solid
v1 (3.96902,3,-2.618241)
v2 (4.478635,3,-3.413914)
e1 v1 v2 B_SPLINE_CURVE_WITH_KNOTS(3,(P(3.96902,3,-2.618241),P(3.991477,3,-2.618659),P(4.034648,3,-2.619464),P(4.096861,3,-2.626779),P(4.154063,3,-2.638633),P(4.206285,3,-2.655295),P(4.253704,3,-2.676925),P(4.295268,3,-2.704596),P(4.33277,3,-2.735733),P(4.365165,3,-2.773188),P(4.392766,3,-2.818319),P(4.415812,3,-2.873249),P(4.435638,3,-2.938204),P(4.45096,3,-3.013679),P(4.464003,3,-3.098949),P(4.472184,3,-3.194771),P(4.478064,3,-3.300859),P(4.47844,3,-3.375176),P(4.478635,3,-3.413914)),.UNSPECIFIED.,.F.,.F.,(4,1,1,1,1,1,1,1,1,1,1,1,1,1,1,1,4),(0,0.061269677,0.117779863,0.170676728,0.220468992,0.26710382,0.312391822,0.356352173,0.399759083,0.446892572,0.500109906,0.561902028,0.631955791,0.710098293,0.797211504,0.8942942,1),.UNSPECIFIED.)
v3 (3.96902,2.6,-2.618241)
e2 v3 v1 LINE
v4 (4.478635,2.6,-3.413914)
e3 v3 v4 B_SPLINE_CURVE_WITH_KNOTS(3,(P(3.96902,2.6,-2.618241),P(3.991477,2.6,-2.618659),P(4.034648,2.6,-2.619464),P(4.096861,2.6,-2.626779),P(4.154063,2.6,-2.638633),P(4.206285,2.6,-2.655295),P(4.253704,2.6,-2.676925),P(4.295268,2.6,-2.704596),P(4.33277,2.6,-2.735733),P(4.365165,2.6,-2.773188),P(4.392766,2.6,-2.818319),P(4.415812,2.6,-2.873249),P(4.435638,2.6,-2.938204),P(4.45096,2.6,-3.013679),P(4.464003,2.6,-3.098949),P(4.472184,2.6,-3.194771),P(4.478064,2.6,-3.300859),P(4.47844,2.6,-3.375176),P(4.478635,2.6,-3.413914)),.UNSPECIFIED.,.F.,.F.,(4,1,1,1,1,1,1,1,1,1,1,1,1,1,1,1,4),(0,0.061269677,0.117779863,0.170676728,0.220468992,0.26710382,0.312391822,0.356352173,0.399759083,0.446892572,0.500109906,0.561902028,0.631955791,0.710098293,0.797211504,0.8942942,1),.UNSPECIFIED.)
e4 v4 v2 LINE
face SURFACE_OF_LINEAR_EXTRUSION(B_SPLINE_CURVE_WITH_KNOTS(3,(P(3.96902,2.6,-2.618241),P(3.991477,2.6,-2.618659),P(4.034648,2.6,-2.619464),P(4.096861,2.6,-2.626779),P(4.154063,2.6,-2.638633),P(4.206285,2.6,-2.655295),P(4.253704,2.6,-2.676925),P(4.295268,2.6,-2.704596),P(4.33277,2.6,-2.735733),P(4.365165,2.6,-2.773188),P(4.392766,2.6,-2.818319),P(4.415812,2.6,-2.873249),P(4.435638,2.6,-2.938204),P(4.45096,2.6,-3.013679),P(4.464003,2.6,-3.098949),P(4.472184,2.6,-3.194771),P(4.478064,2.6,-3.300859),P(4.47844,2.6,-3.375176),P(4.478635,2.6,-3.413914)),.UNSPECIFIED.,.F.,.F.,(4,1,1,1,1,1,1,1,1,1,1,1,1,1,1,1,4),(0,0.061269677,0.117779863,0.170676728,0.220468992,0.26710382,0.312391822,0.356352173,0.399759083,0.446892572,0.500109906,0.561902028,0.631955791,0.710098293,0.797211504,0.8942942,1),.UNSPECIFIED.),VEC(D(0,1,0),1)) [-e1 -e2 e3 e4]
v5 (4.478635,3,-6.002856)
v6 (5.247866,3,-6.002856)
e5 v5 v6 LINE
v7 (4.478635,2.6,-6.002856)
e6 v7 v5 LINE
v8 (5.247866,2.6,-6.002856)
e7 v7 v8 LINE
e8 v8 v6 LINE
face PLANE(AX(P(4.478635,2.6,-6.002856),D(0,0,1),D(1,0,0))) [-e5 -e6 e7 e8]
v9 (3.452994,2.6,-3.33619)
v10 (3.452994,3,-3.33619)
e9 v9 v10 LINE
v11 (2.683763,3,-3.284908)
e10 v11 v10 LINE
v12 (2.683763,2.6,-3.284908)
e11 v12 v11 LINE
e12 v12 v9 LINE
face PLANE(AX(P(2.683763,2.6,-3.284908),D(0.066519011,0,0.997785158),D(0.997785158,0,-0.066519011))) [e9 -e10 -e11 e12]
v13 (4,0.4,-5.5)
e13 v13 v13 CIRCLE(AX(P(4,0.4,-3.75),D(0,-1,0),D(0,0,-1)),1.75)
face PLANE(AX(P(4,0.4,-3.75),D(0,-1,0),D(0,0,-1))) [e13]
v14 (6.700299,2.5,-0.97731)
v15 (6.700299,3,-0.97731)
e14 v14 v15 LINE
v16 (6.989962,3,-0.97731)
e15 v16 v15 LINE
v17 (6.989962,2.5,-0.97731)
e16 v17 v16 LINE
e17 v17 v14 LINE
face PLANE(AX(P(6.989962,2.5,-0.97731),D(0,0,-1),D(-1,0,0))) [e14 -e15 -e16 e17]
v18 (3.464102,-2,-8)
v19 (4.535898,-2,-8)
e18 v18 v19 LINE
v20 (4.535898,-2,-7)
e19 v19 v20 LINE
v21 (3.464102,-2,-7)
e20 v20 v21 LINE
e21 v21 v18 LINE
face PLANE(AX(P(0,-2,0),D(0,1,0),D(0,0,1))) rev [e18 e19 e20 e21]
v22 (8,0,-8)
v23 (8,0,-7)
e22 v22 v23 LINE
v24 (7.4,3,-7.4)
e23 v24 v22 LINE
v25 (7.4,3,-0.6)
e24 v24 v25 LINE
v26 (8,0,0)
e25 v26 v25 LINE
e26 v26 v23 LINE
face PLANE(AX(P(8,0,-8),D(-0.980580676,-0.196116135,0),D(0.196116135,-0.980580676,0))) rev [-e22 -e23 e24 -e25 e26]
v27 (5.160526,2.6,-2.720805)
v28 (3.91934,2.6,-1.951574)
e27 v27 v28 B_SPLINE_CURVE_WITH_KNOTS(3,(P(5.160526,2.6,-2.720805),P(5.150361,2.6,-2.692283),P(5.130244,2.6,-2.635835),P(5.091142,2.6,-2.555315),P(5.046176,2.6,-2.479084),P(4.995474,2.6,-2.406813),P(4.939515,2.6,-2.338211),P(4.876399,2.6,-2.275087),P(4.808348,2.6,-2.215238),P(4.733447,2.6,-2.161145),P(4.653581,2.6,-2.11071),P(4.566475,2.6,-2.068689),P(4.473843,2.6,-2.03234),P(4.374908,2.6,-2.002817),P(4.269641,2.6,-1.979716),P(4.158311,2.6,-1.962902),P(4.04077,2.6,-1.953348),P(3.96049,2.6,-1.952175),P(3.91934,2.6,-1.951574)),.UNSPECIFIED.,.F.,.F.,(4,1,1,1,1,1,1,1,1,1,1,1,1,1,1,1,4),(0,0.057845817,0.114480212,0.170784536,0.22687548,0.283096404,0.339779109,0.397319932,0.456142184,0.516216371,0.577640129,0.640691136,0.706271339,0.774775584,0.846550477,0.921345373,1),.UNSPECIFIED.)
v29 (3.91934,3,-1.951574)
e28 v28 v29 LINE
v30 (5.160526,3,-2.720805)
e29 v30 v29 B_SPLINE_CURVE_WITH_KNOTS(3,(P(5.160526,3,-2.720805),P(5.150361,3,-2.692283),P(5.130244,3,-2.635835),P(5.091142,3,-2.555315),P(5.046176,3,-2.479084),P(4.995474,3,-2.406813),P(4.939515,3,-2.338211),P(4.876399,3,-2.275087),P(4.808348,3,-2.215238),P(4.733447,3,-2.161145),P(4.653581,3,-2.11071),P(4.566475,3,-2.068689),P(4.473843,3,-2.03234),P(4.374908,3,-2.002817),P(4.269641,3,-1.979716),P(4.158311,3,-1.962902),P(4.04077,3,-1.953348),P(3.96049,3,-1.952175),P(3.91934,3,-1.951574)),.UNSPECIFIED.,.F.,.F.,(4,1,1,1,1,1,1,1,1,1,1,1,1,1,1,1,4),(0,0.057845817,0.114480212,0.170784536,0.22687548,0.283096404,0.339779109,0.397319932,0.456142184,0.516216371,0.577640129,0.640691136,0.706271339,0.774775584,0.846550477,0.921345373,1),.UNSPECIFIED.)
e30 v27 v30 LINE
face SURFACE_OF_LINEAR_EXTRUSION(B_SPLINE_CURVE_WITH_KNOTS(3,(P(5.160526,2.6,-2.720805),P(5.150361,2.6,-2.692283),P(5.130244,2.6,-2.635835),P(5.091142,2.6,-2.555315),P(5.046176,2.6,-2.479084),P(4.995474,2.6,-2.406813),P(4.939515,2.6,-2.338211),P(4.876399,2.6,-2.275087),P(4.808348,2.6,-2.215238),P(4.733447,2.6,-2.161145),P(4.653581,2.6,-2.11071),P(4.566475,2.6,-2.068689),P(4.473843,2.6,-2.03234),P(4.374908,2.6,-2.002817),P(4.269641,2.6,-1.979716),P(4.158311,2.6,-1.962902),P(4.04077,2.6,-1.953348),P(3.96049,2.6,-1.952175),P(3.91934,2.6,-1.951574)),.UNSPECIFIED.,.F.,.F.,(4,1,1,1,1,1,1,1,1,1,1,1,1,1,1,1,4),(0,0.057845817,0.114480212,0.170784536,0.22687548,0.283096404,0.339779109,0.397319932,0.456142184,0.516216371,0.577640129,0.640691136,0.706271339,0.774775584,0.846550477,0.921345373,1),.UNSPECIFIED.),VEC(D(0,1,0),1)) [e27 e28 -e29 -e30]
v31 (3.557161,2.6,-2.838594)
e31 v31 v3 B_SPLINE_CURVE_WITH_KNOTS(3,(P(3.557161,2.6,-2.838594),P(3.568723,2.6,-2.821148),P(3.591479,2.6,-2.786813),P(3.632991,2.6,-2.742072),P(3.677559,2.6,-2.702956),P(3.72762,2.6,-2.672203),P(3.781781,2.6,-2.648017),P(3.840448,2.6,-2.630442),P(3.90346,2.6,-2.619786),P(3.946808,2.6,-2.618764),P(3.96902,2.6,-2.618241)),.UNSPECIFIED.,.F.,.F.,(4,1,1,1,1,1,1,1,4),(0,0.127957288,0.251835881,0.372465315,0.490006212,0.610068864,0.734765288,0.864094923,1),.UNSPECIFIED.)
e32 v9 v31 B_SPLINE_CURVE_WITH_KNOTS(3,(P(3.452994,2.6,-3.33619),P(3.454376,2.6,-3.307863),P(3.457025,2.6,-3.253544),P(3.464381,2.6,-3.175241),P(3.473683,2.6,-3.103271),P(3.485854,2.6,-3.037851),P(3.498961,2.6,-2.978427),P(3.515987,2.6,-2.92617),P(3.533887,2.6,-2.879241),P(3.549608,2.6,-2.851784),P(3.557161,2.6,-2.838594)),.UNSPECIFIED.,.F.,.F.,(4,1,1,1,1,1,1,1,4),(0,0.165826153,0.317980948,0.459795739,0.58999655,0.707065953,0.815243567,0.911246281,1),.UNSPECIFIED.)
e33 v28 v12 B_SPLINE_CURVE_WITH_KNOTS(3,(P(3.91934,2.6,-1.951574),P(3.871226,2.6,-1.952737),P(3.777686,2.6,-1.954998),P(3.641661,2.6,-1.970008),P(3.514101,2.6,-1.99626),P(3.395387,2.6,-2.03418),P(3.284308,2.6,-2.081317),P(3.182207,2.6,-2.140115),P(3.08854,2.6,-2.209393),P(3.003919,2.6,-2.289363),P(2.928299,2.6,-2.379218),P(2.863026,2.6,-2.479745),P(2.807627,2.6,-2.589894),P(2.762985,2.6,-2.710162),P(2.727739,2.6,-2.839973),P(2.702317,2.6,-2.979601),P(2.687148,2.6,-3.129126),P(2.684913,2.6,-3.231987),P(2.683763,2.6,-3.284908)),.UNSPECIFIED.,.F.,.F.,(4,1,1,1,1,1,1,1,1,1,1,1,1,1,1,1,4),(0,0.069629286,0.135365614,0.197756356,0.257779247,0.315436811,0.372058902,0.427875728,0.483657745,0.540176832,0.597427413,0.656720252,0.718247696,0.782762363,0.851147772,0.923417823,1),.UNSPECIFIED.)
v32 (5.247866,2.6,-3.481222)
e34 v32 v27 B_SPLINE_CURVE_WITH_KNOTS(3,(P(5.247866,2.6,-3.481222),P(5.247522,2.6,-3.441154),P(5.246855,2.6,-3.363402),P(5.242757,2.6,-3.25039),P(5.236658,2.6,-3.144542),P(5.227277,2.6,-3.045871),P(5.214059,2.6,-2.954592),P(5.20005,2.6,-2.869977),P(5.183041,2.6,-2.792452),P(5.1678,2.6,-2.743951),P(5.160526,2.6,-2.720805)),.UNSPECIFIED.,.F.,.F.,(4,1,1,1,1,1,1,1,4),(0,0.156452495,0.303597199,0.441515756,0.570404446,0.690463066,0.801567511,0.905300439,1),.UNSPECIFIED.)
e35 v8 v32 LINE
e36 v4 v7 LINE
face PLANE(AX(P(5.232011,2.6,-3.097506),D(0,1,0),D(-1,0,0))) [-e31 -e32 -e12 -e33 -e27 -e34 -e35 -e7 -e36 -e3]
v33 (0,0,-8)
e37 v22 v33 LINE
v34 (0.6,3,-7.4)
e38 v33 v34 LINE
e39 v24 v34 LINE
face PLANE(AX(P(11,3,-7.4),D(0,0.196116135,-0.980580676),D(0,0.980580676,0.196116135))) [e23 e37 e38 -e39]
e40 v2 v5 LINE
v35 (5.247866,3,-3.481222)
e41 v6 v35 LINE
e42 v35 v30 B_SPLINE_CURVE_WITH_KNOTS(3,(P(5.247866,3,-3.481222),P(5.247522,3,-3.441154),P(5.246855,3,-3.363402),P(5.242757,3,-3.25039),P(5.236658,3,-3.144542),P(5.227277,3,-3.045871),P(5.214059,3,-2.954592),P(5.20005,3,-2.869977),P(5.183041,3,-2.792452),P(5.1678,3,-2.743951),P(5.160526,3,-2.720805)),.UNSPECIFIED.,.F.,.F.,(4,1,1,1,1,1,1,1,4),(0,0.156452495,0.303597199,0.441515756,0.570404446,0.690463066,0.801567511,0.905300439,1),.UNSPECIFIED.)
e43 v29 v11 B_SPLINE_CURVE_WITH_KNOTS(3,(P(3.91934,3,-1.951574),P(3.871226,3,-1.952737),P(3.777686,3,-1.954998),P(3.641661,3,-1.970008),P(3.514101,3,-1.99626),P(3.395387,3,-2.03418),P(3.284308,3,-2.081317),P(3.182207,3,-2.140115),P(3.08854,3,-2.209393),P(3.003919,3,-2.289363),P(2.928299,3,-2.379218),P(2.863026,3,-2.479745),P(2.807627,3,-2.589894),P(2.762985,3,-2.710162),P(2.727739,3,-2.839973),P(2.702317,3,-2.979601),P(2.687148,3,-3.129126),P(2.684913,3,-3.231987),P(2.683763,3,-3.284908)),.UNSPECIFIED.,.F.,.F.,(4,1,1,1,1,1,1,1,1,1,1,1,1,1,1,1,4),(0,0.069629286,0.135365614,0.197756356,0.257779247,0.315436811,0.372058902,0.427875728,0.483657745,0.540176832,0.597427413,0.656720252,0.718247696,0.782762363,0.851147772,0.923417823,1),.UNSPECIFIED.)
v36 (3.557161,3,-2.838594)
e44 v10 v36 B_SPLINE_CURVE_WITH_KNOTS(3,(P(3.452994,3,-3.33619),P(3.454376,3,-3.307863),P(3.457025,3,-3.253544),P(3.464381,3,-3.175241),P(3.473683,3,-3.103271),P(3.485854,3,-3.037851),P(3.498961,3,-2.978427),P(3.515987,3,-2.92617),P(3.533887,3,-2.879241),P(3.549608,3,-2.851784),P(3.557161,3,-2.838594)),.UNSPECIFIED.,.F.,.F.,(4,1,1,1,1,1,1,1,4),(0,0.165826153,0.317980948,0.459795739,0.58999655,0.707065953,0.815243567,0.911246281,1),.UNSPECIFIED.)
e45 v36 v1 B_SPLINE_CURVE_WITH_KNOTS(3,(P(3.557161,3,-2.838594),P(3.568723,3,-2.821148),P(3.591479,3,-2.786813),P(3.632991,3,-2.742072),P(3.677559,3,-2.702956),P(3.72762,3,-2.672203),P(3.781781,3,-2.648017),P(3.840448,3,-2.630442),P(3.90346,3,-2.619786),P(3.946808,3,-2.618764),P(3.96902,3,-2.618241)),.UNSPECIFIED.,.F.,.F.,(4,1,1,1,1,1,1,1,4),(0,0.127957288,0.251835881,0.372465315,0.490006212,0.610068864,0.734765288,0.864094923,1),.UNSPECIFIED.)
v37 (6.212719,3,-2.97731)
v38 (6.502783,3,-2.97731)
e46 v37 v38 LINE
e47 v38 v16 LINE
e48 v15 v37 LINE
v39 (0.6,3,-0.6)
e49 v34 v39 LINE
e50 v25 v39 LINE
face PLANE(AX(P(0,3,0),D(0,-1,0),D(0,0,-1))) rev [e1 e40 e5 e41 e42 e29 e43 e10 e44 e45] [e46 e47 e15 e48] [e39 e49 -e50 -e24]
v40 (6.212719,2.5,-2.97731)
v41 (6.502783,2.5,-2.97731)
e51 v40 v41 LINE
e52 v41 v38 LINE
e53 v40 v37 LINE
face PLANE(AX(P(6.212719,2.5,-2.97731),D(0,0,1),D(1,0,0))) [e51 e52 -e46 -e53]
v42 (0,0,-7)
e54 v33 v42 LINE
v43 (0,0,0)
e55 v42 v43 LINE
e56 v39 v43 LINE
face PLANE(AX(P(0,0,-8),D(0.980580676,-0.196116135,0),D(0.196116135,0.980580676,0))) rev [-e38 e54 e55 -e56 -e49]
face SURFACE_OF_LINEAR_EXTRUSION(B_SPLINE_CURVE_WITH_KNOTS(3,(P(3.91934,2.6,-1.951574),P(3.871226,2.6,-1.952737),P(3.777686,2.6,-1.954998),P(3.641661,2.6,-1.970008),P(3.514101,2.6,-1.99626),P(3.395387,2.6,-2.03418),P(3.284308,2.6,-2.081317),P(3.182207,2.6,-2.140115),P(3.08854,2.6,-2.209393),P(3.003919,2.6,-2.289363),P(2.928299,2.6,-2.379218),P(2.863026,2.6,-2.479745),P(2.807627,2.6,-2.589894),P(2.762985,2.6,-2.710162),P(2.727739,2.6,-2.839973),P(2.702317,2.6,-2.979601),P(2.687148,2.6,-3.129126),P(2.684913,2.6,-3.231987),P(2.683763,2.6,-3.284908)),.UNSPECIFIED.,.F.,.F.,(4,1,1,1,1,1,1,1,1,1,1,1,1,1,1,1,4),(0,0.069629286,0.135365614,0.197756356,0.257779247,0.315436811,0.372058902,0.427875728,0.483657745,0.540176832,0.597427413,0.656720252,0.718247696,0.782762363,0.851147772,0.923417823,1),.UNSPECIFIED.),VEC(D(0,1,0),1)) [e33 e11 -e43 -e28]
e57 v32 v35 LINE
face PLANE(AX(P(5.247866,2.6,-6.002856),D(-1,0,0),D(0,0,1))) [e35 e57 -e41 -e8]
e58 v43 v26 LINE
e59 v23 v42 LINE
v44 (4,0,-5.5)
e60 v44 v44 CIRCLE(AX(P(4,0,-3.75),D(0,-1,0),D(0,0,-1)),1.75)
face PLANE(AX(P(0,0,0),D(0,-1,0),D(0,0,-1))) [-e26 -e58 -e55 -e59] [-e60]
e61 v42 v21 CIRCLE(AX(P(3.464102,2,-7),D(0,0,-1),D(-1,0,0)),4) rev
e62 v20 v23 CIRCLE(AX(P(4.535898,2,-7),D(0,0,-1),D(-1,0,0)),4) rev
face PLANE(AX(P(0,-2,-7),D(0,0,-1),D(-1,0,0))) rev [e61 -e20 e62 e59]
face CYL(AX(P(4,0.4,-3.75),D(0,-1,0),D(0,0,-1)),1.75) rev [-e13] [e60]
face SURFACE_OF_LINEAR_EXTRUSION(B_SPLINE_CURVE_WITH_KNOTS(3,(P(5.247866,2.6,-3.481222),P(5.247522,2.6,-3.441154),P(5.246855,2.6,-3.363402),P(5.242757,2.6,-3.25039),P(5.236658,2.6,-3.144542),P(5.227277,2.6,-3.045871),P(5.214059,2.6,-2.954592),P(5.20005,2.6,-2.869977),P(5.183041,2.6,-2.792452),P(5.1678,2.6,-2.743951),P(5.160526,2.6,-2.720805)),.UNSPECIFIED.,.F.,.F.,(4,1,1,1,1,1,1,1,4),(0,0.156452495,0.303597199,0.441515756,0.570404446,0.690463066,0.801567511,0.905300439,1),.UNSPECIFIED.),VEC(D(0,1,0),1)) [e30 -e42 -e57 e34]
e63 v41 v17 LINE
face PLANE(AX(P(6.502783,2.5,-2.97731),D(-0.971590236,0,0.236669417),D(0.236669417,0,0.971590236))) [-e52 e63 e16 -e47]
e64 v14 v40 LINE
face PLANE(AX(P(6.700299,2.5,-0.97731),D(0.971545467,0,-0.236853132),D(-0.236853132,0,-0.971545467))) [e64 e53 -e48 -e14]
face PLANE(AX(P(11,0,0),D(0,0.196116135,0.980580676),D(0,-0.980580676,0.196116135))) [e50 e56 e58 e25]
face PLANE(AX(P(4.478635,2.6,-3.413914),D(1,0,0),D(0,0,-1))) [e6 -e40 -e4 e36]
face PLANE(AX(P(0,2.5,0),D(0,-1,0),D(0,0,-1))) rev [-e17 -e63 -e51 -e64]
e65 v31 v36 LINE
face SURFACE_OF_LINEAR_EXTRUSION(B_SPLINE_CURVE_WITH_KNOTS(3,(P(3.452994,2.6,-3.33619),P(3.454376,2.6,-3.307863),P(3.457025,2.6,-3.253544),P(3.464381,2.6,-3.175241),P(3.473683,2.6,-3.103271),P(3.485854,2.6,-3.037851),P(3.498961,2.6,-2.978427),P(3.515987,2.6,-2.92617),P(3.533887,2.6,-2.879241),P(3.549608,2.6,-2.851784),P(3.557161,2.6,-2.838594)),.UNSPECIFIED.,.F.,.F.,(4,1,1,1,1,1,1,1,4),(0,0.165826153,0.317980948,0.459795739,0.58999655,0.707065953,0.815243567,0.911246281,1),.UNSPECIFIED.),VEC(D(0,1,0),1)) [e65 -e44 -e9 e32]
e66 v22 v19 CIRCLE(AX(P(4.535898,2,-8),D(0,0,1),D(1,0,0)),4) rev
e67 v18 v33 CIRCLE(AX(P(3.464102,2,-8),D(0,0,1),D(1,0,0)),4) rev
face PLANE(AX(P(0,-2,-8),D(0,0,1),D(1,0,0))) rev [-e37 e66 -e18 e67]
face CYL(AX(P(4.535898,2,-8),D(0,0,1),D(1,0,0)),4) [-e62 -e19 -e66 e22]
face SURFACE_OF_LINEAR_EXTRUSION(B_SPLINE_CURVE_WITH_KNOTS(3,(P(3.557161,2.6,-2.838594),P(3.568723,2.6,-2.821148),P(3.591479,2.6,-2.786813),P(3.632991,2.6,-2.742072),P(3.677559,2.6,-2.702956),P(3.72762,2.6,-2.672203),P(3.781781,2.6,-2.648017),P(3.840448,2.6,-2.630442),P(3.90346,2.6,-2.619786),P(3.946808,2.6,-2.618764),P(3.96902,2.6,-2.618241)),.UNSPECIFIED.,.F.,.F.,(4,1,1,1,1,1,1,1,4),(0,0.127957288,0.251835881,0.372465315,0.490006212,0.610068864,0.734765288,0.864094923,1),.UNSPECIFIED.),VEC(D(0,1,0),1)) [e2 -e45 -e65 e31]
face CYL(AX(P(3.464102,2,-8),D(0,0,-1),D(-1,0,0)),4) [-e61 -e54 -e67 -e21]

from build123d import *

# Parameters (mm, degrees)
SKETCH1_W               = 8
SKETCH1_H               = 8
BOSS_EXTRUDE1_DEPTH     = 3
CUT_EXTRUDE1_DEPTH      = 12.704699911
CUT_EXTRUDE1_DEPTH_BACK = 12.704699911
CUT_EXTRUDE2_DEPTH      = 11
SKETCH4_R               = 1.75
CUT_EXTRUDE3_DEPTH      = 0.4
SKETCH5_W               = 8
SKETCH5_H               = 1
BOSS_EXTRUDE2_DEPTH     = 2
FILLET1_R               = 4
CUT_EXTRUDE4_DEPTH      = 0.4
CUT_EXTRUDE5_DEPTH      = 0.5


with BuildPart() as part:
    # Sketch1 → Boss-Extrude1 (new body)
    with BuildSketch(Plane(origin=(0, 0, 0), x_dir=(1, 0, 0), z_dir=(0, 1, 0))):
        with Locations((4, 4)):
            Rectangle(SKETCH1_W, SKETCH1_H)
    extrude(amount=BOSS_EXTRUDE1_DEPTH)

    # Sketch2 → Cut-Extrude1 (cut, two sides: drawn at the far end of the back side and taken through both)
    with BuildSketch(Plane.XY.offset(-CUT_EXTRUDE1_DEPTH_BACK)):
        Polygon((0, 0), (0.6, 3), (0, 3), align=None)
        Polygon((8, 0), (7.4, 3), (8, 3), align=None)
    extrude(amount=CUT_EXTRUDE1_DEPTH + CUT_EXTRUDE1_DEPTH_BACK, mode=Mode.SUBTRACT)

    # Sketch3 → Cut-Extrude2 (cut)
    with BuildSketch(Plane(origin=(0, 0, 0), x_dir=(0, 0, -1), z_dir=(1, 0, 0))):
        Polygon((0, 0), (0.6, 3), (0, 3), align=None)
        Polygon((8, 3), (7.4, 3), (8, 0), align=None)
    extrude(amount=CUT_EXTRUDE2_DEPTH, mode=Mode.SUBTRACT)

    # Sketch4 → Cut-Extrude3 (cut)
    with BuildSketch(Plane.XZ):
        with Locations(Location((4, -3.75, 0), (0, 0, 270))):
            Circle(SKETCH4_R)
    extrude(amount=-CUT_EXTRUDE3_DEPTH, mode=Mode.SUBTRACT)

    # Sketch5 → Boss-Extrude2 (add)
    with BuildSketch(Plane.XZ):
        with Locations((4, -7.5)):
            Rectangle(SKETCH5_W, SKETCH5_H)
    extrude(amount=BOSS_EXTRUDE2_DEPTH)

    # Fillet1
    # the kernel refuses this fillet: 4 mm, written as the material it takes off along each edge
    with BuildSketch(Plane(origin=(8, -2, -16.660254038), x_dir=(0, 1, 0), z_dir=(0, 0, 1)), Plane(origin=(0, -2, 1.660254038), x_dir=(0, 1, 0), z_dir=(0, 0, -1))) as fillet1_piece_1:
        with BuildLine():
            CenterArc((4, 3.464101615), FILLET1_R, 180, 60)
            Line((0, 3.464101615), (-0.08, 3.464101615))
            Line((-0.08, 3.464101615), (-0.08, 0))
            Line((-0.08, 0), (0, -0.08))
            ThreePointArc((0, -0.08), (1, -0.08), (1.96, -0.069282032))
            Line((1.96, -0.069282032), (2, 0))
        make_face()
    extrude(amount=18.320508076, mode=Mode.SUBTRACT)

    # Sketch6 → Cut-Extrude4 (cut)
    with BuildSketch(Plane(origin=(0, 3, 0), x_dir=(1, 0, 0), z_dir=(0, 1, 0))):
        with BuildLine():
            Line((4.478635236, 6.002856352), (5.247866005, 6.002856352))
            Line((5.247866005, 6.002856352), (5.247866005, 3.481221736))
            add(Edge.make_bspline(
                [(5.247866005, 3.481221736), (5.247522255, 3.441153869), (5.246855206, 3.363401883), (5.242756502, 3.250390465), (5.236658321, 3.14454193), (5.227277222, 3.045871471), (5.21405872, 2.954592388), (5.200049867, 2.869976575), (5.183041427, 2.792451692), (5.167800036, 2.743951306), (5.160526262, 2.72080507)],
                knots=[0, 0, 0, 0, 1.251619961, 2.428777588, 3.532126049, 4.56323557, 5.523704531, 6.412540087, 7.242403515, 8, 8, 8, 8], degree=3))
            add(Edge.make_bspline(
                [(5.160526262, 2.72080507), (5.150361081, 2.692282601), (5.130243602, 2.635834988), (5.091141653, 2.555314881), (5.046176431, 2.479084315), (4.995474484, 2.406812938), (4.939514717, 2.338210987), (4.876399077, 2.275086649), (4.8083478, 2.215238098), (4.733446681, 2.161145289), (4.653580791, 2.110709794), (4.566475051, 2.068688963), (4.473843299, 2.032340387), (4.374908104, 2.002816628), (4.269640778, 1.979716073), (4.158311001, 1.962901894), (4.040770466, 1.95334773), (3.960490164, 1.952175274), (3.919340364, 1.9515743)],
                knots=[0, 0, 0, 0, 0.925533072, 1.831683394, 2.73255258, 3.630007683, 4.529542467, 5.436465751, 6.357118906, 7.298274949, 8.259461937, 9.242242071, 10.251058183, 11.300341426, 12.396409345, 13.544807631, 14.74152597, 16, 16, 16, 16], degree=3))
            add(Edge.make_bspline(
                [(3.919340364, 1.9515743), (3.871225528, 1.952737211), (3.777685944, 1.954998015), (3.641661475, 1.97000769), (3.514100564, 1.996260242), (3.395387048, 2.034179675), (3.284307874, 2.08131717), (3.182206561, 2.140114726), (3.088540477, 2.209392701), (3.003918711, 2.289363431), (2.928299433, 2.379218215), (2.863026475, 2.479745415), (2.80762712, 2.589893743), (2.762984692, 2.710161506), (2.727739397, 2.839972913), (2.702317462, 2.979601288), (2.687147894, 3.129126134), (2.684913172, 3.2319872), (2.683763441, 3.284907634)],
                knots=[0, 0, 0, 0, 1.114068574, 2.165849827, 3.164101702, 4.124467949, 5.046988974, 5.952942428, 6.846011651, 7.738523925, 8.642829306, 9.558838605, 10.50752403, 11.491963144, 12.524197802, 13.618364352, 14.774685164, 16, 16, 16, 16], degree=3))
            Line((2.683763441, 3.284907634), (3.45299421, 3.336189685))
            add(Edge.make_bspline(
                [(3.45299421, 3.336189685), (3.454375767, 3.307862598), (3.45702498, 3.25354382), (3.464380935, 3.175240866), (3.473682687, 3.103271277), (3.485853837, 3.037851064), (3.498960823, 2.978427444), (3.515987002, 2.926169857), (3.533886556, 2.879240769), (3.549608387, 2.851783511), (3.557160877, 2.838593531)],
                knots=[0, 0, 0, 0, 1.326609226, 2.543847584, 3.678365909, 4.719972403, 5.656527627, 6.521948534, 7.28997025, 8, 8, 8, 8], degree=3))
            add(Edge.make_bspline(
                [(3.557160877, 2.838593531), (3.56872297, 2.821148121), (3.59147861, 2.786813382), (3.632990929, 2.742071605), (3.677558537, 2.702955843), (3.727619554, 2.672203009), (3.781780527, 2.648016829), (3.840448037, 2.63044225), (3.903460331, 2.619785853), (3.946808463, 2.61876437), (3.969019851, 2.618240967)],
                knots=[0, 0, 0, 0, 1.023658308, 2.014687051, 2.979722519, 3.920049697, 4.880550909, 5.878122304, 6.912759386, 8, 8, 8, 8], degree=3))
            add(Edge.make_bspline(
                [(3.969019851, 2.618240967), (3.991477248, 2.618659453), (4.034647527, 2.619463917), (4.09686091, 2.626779219), (4.154063033, 2.638632824), (4.206285054, 2.655294856), (4.253703868, 2.676924623), (4.295268393, 2.704596166), (4.33276969, 2.735732915), (4.36516489, 2.773188264), (4.392766236, 2.818318957), (4.415812105, 2.873248962), (4.43563784, 2.938204221), (4.450960178, 3.01367855), (4.464002509, 3.098949399), (4.472183692, 3.194770716), (4.478064386, 3.300859295), (4.478439634, 3.37517575), (4.478635236, 3.413914044)],
                knots=[0, 0, 0, 0, 0.980314827, 1.884477813, 2.730827652, 3.527503874, 4.27366112, 4.998269146, 5.70163477, 6.396145331, 7.150281155, 8.001758491, 8.990432449, 10.111292654, 11.361572691, 12.75538406, 14.308707205, 16, 16, 16, 16], degree=3))
            Line((4.478635236, 3.413914044), (4.478635236, 6.002856352))
        make_face()
    extrude(amount=-CUT_EXTRUDE4_DEPTH, mode=Mode.SUBTRACT)

    # Sketch7 → Cut-Extrude5 (cut)
    with BuildSketch(Plane(origin=(0, 3, 0), x_dir=(1, 0, 0), z_dir=(0, 1, 0))):
        Polygon((6.21271865, 2.977310221), (6.502782752, 2.977310221), (6.989962239, 0.977310221), (6.700298778, 0.977310221), align=None)
    extrude(amount=-CUT_EXTRUDE5_DEPTH, mode=Mode.SUBTRACT)


solid = part.part
